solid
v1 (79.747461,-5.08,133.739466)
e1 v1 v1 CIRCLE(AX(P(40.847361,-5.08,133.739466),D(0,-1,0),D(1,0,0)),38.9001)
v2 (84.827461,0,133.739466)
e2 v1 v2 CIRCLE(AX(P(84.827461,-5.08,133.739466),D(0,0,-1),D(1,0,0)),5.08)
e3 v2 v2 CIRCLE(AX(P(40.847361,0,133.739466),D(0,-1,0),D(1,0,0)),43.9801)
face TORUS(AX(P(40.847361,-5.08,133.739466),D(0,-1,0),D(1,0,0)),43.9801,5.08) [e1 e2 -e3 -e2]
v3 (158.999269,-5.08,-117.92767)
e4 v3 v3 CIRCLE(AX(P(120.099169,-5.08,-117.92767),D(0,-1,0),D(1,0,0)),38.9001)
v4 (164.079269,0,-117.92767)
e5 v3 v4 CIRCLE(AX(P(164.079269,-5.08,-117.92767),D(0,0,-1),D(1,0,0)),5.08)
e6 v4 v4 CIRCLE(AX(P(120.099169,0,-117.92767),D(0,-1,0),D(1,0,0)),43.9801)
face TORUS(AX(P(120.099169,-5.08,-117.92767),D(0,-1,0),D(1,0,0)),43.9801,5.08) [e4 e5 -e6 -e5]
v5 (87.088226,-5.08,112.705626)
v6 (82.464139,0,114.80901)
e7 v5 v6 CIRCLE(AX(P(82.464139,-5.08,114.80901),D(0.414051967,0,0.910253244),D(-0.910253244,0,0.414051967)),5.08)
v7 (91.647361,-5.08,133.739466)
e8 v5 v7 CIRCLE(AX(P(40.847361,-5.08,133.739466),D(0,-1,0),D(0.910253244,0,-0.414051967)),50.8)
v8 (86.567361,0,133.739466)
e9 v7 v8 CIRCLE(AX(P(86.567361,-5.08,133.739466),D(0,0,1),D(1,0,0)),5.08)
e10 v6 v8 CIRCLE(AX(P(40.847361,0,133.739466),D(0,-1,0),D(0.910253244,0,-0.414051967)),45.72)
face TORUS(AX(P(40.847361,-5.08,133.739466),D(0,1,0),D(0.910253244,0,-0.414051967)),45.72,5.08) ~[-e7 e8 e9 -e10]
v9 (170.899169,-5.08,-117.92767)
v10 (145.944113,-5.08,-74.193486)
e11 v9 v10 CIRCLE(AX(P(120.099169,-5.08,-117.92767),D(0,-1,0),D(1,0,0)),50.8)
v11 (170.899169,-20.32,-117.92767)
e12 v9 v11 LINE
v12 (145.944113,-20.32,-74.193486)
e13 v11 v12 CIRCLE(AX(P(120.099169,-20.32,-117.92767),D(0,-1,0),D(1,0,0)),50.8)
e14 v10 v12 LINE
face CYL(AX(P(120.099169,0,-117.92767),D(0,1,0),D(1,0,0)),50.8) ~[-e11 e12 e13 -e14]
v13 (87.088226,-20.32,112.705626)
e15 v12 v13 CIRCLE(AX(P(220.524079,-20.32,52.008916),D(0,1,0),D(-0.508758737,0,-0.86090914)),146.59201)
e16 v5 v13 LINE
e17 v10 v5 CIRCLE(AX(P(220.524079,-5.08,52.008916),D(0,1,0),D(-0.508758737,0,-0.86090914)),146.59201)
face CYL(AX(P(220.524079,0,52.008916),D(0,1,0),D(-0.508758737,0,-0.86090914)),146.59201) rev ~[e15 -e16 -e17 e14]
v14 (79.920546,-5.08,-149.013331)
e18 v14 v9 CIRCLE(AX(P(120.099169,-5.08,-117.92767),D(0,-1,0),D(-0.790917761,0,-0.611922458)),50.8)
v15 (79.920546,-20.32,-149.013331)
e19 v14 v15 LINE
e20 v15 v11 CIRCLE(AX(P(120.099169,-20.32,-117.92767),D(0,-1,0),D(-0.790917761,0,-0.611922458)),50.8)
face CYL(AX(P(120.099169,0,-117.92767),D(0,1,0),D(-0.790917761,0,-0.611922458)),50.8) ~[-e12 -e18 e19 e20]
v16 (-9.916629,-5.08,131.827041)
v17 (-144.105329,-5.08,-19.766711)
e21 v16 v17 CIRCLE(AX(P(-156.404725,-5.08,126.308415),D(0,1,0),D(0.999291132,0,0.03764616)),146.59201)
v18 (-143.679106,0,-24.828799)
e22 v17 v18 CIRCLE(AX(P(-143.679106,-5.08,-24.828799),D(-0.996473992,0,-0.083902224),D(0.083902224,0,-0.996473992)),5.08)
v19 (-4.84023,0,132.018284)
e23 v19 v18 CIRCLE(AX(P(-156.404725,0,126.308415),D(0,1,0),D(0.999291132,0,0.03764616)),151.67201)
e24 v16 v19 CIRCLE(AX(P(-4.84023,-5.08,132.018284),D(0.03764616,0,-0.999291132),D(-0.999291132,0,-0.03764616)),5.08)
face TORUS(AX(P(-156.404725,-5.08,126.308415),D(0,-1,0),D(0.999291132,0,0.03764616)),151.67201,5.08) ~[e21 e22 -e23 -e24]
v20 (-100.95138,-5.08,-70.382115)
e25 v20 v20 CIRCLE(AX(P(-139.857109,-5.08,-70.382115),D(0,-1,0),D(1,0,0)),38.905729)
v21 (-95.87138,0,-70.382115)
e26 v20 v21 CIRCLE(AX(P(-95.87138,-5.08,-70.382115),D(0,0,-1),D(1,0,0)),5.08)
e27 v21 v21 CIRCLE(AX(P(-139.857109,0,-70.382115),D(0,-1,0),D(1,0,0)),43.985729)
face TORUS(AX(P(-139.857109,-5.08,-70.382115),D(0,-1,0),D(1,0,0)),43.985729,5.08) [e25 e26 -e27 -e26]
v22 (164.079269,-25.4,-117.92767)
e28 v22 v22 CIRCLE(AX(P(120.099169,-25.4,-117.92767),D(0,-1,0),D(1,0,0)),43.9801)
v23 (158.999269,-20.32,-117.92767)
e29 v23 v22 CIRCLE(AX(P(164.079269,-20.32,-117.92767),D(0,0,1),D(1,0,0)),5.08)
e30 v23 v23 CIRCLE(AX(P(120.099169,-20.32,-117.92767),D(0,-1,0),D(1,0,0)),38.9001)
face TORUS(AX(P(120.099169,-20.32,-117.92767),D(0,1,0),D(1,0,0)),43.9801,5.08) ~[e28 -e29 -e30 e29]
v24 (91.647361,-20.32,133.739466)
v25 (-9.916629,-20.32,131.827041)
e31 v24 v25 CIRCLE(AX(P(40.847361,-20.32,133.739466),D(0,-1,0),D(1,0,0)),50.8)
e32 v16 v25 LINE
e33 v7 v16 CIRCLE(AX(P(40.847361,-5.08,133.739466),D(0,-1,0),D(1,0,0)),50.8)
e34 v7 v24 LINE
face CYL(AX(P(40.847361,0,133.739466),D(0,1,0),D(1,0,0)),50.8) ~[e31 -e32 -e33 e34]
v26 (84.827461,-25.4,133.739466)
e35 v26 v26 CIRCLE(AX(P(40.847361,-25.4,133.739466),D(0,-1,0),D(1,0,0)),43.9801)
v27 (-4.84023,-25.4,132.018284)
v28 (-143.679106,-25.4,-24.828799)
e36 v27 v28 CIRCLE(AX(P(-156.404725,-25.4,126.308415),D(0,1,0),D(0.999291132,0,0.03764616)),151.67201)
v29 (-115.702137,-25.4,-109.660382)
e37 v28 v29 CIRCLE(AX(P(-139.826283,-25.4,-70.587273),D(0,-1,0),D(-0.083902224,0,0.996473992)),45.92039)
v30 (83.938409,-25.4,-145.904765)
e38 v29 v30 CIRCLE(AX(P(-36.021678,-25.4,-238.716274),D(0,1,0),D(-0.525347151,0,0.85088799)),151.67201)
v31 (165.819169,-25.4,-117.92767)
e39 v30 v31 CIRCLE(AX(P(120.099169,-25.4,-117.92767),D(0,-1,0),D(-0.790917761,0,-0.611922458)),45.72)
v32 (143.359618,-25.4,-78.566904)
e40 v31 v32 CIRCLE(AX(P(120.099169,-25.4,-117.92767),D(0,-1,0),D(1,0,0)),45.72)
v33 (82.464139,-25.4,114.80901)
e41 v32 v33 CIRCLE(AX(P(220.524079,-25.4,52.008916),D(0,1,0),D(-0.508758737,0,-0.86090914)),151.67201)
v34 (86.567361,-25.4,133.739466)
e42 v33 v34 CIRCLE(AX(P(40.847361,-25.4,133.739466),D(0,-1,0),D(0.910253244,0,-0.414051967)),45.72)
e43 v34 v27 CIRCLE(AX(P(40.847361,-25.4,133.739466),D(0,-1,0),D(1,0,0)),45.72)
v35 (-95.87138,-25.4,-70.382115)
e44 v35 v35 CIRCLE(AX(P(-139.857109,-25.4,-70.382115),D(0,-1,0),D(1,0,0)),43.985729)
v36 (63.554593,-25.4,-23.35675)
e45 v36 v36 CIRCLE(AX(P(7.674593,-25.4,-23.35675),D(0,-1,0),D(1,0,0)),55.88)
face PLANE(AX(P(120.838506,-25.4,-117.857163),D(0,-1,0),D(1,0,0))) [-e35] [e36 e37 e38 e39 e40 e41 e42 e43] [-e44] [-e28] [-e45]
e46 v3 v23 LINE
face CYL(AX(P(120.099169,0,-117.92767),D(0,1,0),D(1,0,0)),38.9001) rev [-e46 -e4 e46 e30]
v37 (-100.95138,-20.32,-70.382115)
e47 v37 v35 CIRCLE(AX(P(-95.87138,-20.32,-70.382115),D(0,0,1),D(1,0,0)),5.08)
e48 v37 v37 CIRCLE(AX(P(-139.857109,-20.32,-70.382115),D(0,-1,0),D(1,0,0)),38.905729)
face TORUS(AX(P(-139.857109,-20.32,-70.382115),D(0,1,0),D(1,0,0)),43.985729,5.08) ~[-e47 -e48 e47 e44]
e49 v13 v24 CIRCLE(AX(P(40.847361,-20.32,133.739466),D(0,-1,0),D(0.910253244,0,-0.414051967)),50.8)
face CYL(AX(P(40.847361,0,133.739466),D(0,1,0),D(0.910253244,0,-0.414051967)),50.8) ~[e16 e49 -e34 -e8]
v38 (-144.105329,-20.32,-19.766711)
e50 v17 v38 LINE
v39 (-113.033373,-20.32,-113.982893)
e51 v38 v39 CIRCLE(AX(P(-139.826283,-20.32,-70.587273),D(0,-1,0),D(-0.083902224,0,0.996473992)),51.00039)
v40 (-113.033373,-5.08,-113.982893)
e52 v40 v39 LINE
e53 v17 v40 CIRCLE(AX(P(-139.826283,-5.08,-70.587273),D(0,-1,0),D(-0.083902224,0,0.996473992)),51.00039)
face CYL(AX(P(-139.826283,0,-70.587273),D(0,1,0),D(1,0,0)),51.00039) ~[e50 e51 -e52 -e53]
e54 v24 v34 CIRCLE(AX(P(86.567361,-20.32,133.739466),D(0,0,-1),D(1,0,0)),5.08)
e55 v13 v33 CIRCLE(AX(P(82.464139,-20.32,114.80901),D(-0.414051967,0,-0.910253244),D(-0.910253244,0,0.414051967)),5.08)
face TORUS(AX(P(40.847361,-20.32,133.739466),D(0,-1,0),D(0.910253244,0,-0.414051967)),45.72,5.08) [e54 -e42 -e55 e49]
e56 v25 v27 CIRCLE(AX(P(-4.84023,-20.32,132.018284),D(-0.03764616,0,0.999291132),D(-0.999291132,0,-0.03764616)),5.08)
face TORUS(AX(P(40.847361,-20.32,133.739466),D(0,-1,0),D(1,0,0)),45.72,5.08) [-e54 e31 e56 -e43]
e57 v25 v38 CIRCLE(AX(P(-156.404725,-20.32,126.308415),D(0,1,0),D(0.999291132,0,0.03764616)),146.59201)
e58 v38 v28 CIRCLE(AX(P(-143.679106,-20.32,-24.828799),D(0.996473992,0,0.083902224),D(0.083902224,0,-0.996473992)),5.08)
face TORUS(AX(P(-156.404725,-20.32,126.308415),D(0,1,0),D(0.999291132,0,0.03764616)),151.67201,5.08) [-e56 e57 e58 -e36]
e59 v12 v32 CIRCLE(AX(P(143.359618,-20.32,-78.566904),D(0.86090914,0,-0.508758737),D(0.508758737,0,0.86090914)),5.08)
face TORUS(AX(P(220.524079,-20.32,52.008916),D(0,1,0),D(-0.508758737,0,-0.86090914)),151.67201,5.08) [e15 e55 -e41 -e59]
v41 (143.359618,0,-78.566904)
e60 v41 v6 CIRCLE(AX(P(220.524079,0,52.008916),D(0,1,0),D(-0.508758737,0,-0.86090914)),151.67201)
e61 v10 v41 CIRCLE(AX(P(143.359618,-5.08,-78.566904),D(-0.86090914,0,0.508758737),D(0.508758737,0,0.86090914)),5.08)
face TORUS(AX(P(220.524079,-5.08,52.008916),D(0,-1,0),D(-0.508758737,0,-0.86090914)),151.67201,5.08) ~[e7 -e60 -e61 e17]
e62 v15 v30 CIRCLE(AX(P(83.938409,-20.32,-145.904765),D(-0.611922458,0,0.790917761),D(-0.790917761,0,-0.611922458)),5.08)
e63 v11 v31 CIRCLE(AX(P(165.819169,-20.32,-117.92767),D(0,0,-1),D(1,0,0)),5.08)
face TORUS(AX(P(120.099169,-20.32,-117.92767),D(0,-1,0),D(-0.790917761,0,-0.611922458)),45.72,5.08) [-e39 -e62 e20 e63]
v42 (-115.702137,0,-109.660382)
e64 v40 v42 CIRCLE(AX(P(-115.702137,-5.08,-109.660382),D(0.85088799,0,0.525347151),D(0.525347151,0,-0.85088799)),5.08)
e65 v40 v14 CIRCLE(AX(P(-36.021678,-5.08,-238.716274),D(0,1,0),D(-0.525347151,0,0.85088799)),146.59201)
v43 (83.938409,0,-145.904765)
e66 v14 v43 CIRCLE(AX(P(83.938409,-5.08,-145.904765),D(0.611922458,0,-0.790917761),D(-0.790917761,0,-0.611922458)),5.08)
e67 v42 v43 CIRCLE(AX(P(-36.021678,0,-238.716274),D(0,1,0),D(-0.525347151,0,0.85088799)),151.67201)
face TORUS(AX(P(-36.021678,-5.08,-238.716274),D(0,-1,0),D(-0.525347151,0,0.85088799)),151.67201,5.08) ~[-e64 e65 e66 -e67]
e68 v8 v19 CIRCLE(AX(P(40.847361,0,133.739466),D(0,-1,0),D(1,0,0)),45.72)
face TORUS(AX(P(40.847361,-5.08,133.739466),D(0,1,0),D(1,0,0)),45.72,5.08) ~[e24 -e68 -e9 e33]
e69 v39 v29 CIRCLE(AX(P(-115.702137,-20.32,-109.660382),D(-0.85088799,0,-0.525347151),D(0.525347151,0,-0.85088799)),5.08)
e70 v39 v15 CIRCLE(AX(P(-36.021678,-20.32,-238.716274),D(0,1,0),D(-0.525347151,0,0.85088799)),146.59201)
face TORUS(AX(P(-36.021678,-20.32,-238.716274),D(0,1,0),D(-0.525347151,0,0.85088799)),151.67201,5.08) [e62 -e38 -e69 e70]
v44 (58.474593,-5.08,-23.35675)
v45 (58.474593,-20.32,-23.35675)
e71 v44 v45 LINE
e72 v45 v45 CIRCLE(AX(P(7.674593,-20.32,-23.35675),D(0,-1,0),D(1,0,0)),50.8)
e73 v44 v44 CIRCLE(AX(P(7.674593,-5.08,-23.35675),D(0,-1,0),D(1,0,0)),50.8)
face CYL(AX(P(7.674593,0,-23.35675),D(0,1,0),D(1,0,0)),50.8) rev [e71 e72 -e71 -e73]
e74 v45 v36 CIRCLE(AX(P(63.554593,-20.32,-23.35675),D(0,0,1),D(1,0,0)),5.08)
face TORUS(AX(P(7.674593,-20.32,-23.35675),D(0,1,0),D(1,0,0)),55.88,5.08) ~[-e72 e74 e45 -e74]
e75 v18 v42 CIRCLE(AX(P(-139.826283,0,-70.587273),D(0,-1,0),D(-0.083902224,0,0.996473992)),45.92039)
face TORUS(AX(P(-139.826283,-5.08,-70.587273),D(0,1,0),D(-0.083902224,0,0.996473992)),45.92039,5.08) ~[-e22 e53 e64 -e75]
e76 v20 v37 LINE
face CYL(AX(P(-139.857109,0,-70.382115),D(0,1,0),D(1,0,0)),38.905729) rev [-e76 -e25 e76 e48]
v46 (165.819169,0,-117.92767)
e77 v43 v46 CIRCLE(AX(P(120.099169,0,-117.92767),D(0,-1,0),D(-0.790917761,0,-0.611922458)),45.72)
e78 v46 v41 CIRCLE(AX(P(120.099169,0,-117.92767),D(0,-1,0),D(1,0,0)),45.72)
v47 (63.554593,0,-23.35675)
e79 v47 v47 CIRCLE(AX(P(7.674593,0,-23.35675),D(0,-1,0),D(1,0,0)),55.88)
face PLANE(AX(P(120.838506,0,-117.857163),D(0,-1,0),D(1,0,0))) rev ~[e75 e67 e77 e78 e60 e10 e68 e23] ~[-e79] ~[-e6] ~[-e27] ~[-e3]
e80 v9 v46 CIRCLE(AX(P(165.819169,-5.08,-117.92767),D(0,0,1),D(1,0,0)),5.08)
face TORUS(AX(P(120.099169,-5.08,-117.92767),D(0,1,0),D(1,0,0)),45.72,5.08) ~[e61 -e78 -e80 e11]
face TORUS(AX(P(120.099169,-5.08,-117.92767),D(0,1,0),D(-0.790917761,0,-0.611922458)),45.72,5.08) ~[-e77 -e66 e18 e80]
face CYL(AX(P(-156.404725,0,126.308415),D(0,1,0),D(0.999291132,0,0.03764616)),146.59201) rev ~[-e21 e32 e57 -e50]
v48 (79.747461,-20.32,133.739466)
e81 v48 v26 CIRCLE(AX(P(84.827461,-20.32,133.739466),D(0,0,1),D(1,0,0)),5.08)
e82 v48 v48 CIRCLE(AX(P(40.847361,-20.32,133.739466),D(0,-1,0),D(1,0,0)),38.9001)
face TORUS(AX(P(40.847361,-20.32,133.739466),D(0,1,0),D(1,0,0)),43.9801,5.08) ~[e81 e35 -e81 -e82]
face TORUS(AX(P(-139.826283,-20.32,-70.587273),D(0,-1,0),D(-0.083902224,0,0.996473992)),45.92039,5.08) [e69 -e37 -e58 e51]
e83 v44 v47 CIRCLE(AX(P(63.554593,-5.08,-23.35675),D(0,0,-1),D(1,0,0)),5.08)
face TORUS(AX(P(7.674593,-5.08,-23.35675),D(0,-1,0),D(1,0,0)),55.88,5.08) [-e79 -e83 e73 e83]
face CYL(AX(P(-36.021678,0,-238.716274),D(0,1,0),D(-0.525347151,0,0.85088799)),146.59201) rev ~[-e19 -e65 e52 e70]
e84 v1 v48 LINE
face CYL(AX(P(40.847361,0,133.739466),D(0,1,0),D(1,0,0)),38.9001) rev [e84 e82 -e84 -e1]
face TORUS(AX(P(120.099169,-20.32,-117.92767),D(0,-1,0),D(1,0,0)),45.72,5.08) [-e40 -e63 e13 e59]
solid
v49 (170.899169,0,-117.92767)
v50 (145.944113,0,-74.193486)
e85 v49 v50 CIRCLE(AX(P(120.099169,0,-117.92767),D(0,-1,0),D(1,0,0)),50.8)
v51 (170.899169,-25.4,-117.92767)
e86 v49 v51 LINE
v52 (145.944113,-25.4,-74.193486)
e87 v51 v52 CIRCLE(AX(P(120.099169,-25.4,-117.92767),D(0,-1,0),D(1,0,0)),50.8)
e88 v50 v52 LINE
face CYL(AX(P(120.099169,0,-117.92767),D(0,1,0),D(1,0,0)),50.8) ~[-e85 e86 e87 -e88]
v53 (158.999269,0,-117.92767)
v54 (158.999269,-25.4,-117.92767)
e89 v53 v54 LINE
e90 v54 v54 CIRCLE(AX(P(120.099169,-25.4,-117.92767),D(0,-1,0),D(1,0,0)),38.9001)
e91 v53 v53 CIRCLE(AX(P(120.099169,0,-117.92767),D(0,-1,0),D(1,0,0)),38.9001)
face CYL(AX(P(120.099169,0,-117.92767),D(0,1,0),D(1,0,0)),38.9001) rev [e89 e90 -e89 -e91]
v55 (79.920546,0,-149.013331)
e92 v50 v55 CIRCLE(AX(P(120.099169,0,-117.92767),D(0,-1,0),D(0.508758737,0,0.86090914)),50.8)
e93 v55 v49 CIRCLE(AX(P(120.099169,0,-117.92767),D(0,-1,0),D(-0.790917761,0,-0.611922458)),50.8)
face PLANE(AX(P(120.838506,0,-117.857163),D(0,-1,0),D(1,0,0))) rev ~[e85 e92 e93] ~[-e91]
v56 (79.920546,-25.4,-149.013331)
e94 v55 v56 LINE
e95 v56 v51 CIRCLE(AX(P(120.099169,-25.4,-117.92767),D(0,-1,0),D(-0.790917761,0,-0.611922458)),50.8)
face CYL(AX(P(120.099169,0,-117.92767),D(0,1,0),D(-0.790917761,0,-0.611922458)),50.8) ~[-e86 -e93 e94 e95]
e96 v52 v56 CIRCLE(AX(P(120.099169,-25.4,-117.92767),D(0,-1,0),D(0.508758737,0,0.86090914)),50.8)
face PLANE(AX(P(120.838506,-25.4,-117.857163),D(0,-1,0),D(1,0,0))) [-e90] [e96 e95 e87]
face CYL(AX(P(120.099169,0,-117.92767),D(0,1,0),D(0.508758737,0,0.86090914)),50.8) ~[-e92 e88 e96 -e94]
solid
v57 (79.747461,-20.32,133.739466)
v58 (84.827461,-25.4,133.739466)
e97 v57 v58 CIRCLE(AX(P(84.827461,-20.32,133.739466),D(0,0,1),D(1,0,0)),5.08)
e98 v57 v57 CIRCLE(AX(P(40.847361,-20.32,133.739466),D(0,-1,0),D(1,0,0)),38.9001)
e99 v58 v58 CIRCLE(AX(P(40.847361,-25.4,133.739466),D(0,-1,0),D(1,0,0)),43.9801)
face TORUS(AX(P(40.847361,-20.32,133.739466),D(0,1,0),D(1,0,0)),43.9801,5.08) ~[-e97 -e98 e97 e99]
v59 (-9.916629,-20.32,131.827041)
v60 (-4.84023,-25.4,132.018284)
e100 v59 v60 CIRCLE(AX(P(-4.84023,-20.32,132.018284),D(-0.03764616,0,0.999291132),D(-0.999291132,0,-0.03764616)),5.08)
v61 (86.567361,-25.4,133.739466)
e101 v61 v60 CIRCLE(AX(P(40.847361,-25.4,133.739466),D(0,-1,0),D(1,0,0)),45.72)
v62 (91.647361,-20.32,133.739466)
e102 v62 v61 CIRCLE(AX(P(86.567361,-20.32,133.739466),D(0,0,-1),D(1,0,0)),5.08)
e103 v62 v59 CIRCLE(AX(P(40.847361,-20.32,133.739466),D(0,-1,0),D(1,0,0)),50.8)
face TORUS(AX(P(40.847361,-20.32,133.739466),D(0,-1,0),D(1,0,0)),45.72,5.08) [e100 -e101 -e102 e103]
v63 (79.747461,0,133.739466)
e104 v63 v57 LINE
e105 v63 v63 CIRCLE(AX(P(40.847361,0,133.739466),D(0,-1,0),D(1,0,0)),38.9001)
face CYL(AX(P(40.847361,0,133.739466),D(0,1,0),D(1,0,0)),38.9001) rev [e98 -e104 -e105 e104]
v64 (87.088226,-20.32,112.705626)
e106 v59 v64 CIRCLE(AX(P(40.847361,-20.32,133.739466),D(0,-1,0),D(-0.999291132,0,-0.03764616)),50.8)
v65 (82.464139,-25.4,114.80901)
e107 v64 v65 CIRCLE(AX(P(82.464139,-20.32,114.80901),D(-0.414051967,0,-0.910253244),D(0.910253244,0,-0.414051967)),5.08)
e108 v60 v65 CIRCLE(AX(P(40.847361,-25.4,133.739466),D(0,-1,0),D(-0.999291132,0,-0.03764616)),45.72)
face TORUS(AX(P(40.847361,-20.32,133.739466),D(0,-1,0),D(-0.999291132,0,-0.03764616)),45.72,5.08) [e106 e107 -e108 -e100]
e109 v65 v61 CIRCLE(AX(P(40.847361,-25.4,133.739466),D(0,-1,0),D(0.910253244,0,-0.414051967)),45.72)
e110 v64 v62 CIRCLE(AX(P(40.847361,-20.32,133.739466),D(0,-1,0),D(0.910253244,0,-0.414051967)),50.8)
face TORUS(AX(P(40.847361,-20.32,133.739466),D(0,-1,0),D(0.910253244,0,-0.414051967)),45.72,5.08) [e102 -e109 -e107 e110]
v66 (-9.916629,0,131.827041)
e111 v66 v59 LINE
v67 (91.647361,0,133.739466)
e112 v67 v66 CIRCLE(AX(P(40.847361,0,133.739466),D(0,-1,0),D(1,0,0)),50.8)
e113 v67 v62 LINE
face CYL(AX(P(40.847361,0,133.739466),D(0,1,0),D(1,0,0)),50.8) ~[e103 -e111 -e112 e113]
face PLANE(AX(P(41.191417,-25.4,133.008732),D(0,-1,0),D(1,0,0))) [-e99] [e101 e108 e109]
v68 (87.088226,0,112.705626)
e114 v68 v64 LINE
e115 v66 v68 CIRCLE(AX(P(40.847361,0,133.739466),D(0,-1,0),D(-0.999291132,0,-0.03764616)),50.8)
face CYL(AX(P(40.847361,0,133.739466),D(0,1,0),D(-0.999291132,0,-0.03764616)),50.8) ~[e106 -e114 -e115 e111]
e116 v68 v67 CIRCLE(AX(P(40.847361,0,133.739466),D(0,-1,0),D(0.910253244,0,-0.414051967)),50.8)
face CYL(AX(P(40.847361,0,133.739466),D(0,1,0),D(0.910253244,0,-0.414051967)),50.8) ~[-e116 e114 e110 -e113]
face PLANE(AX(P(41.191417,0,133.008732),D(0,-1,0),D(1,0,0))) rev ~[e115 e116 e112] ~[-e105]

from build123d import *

# Parameters (mm, degrees)
F0_R     = 38.9001
F1_DEPTH = 25.4
F2_R     = 36.0475223941
F3_DEPTH = 25.4
F0_R_2   = 50.8
F0_R_3   = 38.9057287441
F4_DEPTH = 25.4
F5_R     = 5.08
F5_2_R   = 5.08


# Not quite as in the source:
# - a feature names something its author has since deleted; it is built from what else it names


with BuildPart() as f1:
    # F0 (on Front) → F1 (new body)
    with BuildSketch(Plane.XZ):
        with BuildLine():
            ThreePointArc((-9.9166287314, 131.8270411846), (31.0228103029, 83.8985370579), (87.088225593, 112.705626196))
            ThreePointArc((87.088225593, 112.705626196), (90.4944953008, 122.9783307664), (91.6473607783, 133.7394661017))
            ThreePointArc((91.6473607783, 133.7394661017), (39.8909788175, 184.5304626813), (-9.9166287314, 131.8270411846))
        make_face()
        with Locations((40.8473607783, 133.7394661017)):
            Circle(F0_R, mode=Mode.SUBTRACT)
    extrude(amount=F1_DEPTH)

    # F2 (on face) → F3 (cut)
    with BuildSketch(Plane.XZ.offset(25.4)):
        with Locations((40.8473607783, 133.7394661017)):
            Circle(F2_R)
    extrude(amount=-F3_DEPTH, mode=Mode.SUBTRACT)

    # F5
    f5_edges = [f1.edges().sort_by_distance(p)[0] for p in [
        (91.61135, -25.4, 135.651891),
        (1.947261, -25.4, 133.739466),
    ]]
    fillet(f5_edges, radius=F5_R)


with BuildPart() as f1b:
    # F0 (on Front) → F1, piece 2 (new body)
    with BuildSketch(Plane.XZ):
        with BuildLine():
            ThreePointArc((79.920546499, -149.0133307512), (136.5242408943, -165.9990439413), (170.899168766, -117.927669865))
            ThreePointArc((170.899168766, -117.927669865), (164.2215165418, -92.7511246939), (145.9441125945, -74.1934855409))
            ThreePointArc((145.9441125945, -74.1934855409), (82.0089351921, -84.3155573715), (79.920546499, -149.0133307512))
        make_face()
        with Locations((120.099168766, -117.927669865)):
            Circle(F0_R, mode=Mode.SUBTRACT)
    extrude(amount=F1_DEPTH)


with BuildPart() as f4:
    # F0 (on Front) → F4 (new body)
    with BuildSketch(Plane.XZ):
        with BuildLine():
            ThreePointArc((79.920546499, -149.0133307512), (136.5242408943, -165.9990439413), (170.899168766, -117.927669865))
            ThreePointArc((170.899168766, -117.927669865), (164.2215165418, -92.7511246939), (145.9441125945, -74.1934855409))
            ThreePointArc((145.9441125945, -74.1934855409), (82.0089351921, -84.3155573715), (79.920546499, -149.0133307512))
        make_face()
        with Locations((120.099168766, -117.927669865)):
            Circle(F0_R, mode=Mode.SUBTRACT)
        with BuildLine():
            ThreePointArc((79.920546499, -149.0133307512), (82.0089351921, -84.3155573715), (145.9441125945, -74.1934855409))
            ThreePointArc((145.9441125945, -74.1934855409), (80.7011021876, 7.9776457744), (87.088225593, 112.705626196))
            ThreePointArc((87.088225593, 112.705626196), (31.0228103029, 83.8985370579), (-9.9166287314, 131.8270411846))
            ThreePointArc((-9.9166287314, 131.8270411846), (-46.6389135841, 29.145231561), (-144.1053289729, -19.7667107809))
            ThreePointArc((-144.1053289729, -19.7667107809), (-105.309570926, -33.0421482364), (-88.8258923823, -70.5872734025))
            ThreePointArc((-88.8258923823, -70.5872734025), (-95.2870378452, -95.4327052049), (-113.0333730134, -113.9828930812))
            ThreePointArc((-113.0333730134, -113.9828930812), (-9.8361968908, -94.4819575628), (79.920546499, -149.0133307512))
        make_face()
        with Locations((7.6745930707, -23.3567503257)):
            Circle(F0_R_2, mode=Mode.SUBTRACT)
        with BuildLine():
            ThreePointArc((-9.9166287314, 131.8270411846), (31.0228103029, 83.8985370579), (87.088225593, 112.705626196))
            ThreePointArc((87.088225593, 112.705626196), (90.4944953008, 122.9783307664), (91.6473607783, 133.7394661017))
            ThreePointArc((91.6473607783, 133.7394661017), (39.8909788175, 184.5304626813), (-9.9166287314, 131.8270411846))
        make_face()
        with Locations((40.8473607783, 133.7394661017)):
            Circle(F0_R, mode=Mode.SUBTRACT)
        with BuildLine():
            ThreePointArc((-144.1053289729, -19.7667107809), (-188.2606792964, -86.5606592744), (-113.0333730134, -113.9828930812))
            ThreePointArc((-113.0333730134, -113.9828930812), (-95.2870378452, -95.4327052049), (-88.8258923823, -70.5872734025))
            ThreePointArc((-88.8258923823, -70.5872734025), (-105.309570926, -33.0421482364), (-144.1053289729, -19.7667107809))
        make_face()
        with Locations((-139.8571086664, -70.3821146693)):
            Circle(F0_R_3, mode=Mode.SUBTRACT)
    extrude(amount=F4_DEPTH)

    # F5#2
    f5_2_edges = [f4.edges().sort_by_distance(p)[0] for p in [
        (1.947261, -25.4, 133.739466),
        (158.189402, 0, -151.539782),
        (80.701102, 0, 7.977646),
        (50.671911, 0, 183.580395),
        (-46.638914, 0, 29.145232),
        (-188.260679, 0, -86.560659),
        (-9.836197, 0, -94.481958),
        (81.199069, 0, -117.92767),
        (-43.125407, 0, -23.35675),
        (1.947261, 0, 133.739466),
        (-178.762837, 0, -70.382115),
        (158.189402, -25.4, -151.539782),
        (80.701102, -25.4, 7.977646),
        (50.671911, -25.4, 183.580395),
        (-46.638914, -25.4, 29.145232),
        (-188.260679, -25.4, -86.560659),
        (-9.836197, -25.4, -94.481958),
        (81.199069, -25.4, -117.92767),
        (-43.125407, -25.4, -23.35675),
        (-178.762837, -25.4, -70.382115),
        (-9.916629, -12.7, 131.827041),
        (-144.105329, -12.7, -19.766711),
    ]]
    fillet(f5_2_edges, radius=F5_2_R)


solid = Compound([f1.part, f1b.part, f4.part])
